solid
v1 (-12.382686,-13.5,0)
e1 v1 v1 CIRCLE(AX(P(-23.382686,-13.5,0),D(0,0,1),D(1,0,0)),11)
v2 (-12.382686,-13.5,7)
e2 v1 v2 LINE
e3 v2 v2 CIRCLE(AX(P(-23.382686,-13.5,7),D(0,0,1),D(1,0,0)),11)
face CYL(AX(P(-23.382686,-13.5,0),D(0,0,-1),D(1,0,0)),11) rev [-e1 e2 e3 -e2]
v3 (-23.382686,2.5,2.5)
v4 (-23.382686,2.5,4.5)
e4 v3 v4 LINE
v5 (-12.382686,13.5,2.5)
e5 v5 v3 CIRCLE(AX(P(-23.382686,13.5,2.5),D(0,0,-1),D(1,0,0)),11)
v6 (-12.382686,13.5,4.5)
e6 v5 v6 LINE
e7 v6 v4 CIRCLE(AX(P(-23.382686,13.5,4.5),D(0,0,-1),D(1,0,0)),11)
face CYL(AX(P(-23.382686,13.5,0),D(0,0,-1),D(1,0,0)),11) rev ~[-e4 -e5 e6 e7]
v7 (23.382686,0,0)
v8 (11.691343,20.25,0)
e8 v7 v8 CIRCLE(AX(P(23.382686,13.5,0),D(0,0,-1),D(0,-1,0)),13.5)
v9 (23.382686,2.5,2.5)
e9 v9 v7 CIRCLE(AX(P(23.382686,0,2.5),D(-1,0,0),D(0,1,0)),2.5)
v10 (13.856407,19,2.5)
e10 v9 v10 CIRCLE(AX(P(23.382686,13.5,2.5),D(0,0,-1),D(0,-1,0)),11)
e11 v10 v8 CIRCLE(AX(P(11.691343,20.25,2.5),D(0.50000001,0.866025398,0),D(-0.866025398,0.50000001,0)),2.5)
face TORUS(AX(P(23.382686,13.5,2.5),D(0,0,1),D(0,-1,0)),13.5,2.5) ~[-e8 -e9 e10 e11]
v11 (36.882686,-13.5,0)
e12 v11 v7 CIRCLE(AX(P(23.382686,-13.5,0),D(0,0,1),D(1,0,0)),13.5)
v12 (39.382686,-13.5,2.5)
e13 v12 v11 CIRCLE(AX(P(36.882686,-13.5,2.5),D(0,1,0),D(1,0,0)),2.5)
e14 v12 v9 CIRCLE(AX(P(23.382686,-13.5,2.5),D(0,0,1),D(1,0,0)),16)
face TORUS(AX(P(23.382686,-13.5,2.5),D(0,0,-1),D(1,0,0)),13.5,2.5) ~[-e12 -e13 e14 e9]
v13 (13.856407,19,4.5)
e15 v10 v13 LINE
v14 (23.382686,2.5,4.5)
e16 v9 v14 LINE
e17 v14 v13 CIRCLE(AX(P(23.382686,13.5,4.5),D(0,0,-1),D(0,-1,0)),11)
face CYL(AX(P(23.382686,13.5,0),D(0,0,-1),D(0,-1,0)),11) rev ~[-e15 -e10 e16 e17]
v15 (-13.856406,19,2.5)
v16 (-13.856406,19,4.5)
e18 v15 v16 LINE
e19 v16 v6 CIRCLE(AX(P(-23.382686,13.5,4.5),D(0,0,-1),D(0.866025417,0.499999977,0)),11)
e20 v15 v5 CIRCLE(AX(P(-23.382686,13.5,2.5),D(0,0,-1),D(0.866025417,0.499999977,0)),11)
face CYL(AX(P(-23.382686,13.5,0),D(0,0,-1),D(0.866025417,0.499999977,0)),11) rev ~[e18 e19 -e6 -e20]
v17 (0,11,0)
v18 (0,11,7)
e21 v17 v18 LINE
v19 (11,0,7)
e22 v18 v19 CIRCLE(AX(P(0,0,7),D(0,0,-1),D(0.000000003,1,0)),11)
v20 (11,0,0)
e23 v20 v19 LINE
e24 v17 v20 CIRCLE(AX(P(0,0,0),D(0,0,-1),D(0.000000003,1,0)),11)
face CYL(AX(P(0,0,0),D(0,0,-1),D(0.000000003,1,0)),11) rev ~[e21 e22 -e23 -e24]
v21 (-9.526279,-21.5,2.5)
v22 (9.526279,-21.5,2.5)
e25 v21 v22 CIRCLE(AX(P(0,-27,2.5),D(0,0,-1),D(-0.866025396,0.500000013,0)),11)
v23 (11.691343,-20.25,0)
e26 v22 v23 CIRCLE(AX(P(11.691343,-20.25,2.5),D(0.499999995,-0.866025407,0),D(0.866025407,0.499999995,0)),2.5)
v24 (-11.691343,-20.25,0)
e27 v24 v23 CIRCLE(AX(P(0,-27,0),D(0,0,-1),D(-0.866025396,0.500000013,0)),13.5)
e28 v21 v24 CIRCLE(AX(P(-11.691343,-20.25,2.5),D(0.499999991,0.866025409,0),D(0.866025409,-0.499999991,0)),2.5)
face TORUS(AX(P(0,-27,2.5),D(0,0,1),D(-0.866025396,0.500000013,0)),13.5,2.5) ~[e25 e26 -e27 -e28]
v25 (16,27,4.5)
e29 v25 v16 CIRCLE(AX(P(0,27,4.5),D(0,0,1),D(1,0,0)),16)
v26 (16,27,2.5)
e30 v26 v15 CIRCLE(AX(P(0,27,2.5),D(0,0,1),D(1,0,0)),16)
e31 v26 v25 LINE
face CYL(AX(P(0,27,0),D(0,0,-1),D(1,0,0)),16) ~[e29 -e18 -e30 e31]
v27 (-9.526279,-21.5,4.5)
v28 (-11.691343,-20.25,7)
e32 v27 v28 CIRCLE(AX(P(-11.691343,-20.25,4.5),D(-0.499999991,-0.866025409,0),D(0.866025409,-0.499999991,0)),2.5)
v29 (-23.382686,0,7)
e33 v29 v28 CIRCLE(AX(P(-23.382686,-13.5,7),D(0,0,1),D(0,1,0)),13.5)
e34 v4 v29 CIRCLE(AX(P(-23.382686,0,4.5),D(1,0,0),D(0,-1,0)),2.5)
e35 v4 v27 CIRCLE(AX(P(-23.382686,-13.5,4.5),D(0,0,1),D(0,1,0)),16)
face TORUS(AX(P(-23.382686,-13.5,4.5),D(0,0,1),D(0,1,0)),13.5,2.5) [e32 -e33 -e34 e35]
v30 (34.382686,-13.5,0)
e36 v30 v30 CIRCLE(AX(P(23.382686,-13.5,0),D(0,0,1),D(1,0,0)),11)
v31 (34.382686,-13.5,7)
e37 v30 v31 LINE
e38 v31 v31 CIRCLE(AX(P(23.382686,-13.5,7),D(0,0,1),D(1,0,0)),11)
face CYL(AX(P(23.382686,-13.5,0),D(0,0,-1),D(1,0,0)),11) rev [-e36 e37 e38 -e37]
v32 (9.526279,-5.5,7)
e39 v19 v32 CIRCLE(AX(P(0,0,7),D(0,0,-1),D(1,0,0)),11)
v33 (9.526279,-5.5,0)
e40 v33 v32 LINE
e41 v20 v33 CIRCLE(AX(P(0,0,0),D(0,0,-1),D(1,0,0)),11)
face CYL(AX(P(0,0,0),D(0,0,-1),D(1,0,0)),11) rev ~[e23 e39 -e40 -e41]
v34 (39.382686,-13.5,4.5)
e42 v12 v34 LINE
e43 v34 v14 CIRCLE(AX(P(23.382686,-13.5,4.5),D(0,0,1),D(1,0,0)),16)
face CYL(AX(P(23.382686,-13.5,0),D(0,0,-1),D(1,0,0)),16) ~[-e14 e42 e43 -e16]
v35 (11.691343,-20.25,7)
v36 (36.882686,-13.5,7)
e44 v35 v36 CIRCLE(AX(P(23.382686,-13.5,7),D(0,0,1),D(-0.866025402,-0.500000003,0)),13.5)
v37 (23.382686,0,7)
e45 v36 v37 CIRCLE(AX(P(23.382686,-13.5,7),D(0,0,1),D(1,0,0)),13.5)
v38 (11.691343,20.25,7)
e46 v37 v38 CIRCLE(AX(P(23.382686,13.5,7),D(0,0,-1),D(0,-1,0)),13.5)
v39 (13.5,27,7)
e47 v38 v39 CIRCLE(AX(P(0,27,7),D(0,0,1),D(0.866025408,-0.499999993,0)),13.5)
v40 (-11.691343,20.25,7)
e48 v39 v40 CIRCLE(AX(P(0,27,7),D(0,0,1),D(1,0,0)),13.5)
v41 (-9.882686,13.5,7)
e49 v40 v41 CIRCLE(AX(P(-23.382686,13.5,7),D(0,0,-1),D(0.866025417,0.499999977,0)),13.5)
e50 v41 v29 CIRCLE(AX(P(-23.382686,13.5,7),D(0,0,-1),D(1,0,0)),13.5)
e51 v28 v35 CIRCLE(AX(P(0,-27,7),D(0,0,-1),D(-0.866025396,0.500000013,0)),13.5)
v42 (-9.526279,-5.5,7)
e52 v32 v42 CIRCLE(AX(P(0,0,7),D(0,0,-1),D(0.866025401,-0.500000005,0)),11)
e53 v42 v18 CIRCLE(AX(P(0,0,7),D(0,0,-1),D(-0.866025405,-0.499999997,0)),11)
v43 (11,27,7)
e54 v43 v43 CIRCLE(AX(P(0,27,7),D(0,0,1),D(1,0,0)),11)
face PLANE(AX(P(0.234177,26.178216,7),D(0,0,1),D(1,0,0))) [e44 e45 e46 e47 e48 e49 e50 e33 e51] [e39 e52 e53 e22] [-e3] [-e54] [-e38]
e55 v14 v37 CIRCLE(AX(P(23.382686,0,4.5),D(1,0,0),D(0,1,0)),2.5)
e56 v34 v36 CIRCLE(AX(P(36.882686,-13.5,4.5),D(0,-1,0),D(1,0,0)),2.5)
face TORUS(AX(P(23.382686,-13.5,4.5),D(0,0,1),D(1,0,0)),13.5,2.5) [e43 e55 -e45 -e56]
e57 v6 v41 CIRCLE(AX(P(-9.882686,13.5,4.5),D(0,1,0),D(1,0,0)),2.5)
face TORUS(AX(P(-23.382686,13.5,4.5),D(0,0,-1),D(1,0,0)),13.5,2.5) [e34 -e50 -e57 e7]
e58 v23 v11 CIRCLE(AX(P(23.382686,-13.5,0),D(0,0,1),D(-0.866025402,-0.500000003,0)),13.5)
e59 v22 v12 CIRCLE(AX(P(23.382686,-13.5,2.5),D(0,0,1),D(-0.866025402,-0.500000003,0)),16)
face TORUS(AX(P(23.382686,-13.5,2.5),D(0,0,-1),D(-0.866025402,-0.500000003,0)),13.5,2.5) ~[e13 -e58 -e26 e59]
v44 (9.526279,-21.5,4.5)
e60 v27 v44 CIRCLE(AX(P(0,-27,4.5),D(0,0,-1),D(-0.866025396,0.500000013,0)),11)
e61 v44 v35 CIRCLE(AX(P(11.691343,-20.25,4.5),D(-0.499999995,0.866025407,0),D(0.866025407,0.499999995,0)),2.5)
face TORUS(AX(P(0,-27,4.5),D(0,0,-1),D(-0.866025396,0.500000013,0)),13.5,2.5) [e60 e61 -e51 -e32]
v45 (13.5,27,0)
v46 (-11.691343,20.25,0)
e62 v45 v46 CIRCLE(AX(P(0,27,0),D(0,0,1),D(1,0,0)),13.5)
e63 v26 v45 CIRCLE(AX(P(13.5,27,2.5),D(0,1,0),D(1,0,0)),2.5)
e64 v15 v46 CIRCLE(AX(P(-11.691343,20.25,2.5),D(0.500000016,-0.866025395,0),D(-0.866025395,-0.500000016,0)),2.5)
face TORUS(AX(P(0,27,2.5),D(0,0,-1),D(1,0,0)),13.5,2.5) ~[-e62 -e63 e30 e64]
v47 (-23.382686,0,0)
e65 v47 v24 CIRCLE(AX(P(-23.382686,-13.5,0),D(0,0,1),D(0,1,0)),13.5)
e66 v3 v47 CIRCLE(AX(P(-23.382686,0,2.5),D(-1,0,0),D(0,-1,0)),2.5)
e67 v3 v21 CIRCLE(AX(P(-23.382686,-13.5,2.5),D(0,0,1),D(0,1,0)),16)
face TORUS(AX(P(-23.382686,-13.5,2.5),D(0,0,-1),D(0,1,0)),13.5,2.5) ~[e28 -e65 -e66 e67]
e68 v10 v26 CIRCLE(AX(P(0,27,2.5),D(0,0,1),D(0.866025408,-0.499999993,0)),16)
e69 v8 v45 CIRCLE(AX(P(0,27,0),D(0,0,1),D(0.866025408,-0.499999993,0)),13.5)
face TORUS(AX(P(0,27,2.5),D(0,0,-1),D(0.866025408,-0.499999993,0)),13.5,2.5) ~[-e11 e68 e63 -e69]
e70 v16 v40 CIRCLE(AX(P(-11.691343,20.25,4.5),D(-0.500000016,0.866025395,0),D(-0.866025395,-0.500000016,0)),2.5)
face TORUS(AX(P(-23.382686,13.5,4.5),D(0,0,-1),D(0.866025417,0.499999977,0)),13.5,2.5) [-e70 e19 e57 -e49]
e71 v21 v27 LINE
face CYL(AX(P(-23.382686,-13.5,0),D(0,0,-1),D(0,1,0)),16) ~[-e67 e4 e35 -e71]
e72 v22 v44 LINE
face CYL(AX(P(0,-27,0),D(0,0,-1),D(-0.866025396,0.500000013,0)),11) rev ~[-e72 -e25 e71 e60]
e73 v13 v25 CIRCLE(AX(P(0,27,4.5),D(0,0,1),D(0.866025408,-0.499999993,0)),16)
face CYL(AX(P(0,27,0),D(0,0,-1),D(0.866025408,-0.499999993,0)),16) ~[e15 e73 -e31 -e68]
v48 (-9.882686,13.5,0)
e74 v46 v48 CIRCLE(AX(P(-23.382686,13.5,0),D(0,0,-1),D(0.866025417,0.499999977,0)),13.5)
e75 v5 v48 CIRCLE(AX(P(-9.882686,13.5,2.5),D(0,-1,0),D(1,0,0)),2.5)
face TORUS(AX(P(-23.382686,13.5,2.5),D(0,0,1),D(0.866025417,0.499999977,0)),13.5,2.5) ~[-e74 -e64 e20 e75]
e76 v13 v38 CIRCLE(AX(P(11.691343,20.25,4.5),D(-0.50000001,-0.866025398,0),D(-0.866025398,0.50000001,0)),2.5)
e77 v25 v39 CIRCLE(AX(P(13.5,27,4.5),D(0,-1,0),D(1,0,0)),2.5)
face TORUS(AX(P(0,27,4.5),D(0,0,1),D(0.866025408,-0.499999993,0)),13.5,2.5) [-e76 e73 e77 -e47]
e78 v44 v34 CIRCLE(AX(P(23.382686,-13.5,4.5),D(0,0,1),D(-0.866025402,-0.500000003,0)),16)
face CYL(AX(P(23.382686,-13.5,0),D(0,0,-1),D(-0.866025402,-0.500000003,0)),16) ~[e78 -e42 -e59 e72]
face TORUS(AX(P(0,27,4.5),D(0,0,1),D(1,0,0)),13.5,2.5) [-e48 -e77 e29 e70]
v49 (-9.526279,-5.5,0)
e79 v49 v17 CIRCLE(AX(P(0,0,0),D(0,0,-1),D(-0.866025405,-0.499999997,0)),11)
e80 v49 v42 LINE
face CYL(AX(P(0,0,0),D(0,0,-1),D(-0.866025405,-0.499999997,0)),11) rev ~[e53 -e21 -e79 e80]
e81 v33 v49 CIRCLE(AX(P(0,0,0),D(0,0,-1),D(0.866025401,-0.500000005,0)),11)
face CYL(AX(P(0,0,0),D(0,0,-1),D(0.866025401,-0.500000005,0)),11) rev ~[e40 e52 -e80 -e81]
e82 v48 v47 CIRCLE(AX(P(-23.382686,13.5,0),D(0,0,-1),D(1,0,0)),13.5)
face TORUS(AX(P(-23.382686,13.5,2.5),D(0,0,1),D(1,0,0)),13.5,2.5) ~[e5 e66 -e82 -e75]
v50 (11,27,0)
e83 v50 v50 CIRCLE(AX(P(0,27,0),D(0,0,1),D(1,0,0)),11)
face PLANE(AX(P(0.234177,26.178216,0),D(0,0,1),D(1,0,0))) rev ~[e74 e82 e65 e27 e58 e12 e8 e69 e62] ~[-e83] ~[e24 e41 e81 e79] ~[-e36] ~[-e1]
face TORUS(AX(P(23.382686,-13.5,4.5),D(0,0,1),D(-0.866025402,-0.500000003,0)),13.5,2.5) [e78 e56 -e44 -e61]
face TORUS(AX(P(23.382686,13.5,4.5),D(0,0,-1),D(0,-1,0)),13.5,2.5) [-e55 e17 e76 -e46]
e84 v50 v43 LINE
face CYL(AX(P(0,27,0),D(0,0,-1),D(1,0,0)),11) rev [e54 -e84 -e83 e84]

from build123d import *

# Parameters (mm, degrees)
F0_R     = 11
F1_DEPTH = 7
F2_R     = 2.5


with BuildPart() as f1:
    # F0 (on Top) → F1 (new body)
    with BuildSketch(Plane.XY):
        with BuildLine():
            ThreePointArc((-13.8564063169, 18.9999997511), (-7.9999998612, 13.1435934593), (3.3e-08, 11))
            ThreePointArc((3.3e-08, 11), (8.0000000671, 13.1435935782), (13.8564065215, 19.0000001056))
            ThreePointArc((13.8564065215, 19.0000001056), (15.4548132364, 22.8588953372), (16, 27))
            ThreePointArc((16, 27), (-4.1411048604, 42.4548131834), (-13.8564063169, 18.9999997511))
        make_face()
        with Locations((0, 27)):
            Circle(F0_R, mode=Mode.SUBTRACT)
        with BuildLine():
            ThreePointArc((-9.5262794581, -5.4999999715), (-9.5262794251, 5.5000000286), (3.3e-08, 11))
            ThreePointArc((3.3e-08, 11), (-7.9999998612, 13.1435934593), (-13.8564063169, 18.9999997511))
            ThreePointArc((-13.8564063169, 18.9999997511), (-12.7575017758, 16.3470093573), (-12.3826859022, 13.5))
            ThreePointArc((-12.3826859022, 13.5), (-15.6045113091, 5.7218254069), (-23.3826859022, 2.5))
            ThreePointArc((-23.3826859022, 2.5), (-15.3826859164, 0.3564064688), (-9.5262794581, -5.4999999715))
        make_face()
        with BuildLine():
            ThreePointArc((9.5262794719, -21.5000000524), (7.3826859022, -13.5000000639), (9.5262794079, -5.5000000584))
            ThreePointArc((9.5262794079, -5.5000000584), (-5.02e-08, -11), (-9.5262794581, -5.4999999715))
            ThreePointArc((-9.5262794581, -5.4999999715), (-7.9278726858, -9.3588952624), (-7.3826859022, -13.5))
            ThreePointArc((-7.3826859022, -13.5), (-7.9278726602, -17.641104642), (-9.5262793592, -21.4999998571))
            ThreePointArc((-9.5262793592, -21.4999998571), (1.127e-07, -16), (9.5262794719, -21.5000000524))
        make_face()
        with BuildLine():
            ThreePointArc((3.3e-08, 11), (7.7781746047, 7.7781745814), (11, 0))
            ThreePointArc((11, 0), (10.6251840805, -2.8470095287), (9.5262794079, -5.5000000584))
            ThreePointArc((9.5262794079, -5.5000000584), (15.382685873, 0.3564064437), (23.3826859022, 2.5))
            ThreePointArc((23.3826859022, 2.5), (13.8564064301, 8.0000000528), (13.8564065215, 19.0000001056))
            ThreePointArc((13.8564065215, 19.0000001056), (8.0000000671, 13.1435935782), (3.3e-08, 11))
        make_face()
        with BuildLine():
            ThreePointArc((-7.3826859022, -13.5), (-7.9278726858, -9.3588952624), (-9.5262794581, -5.4999999715))
            ThreePointArc((-9.5262794581, -5.4999999715), (-15.3826859164, 0.3564064688), (-23.3826859022, 2.5))
            ThreePointArc((-23.3826859022, 2.5), (-37.2390923215, -21.5000000714), (-9.5262793592, -21.4999998571))
            ThreePointArc((-9.5262793592, -21.4999998571), (-7.9278726602, -17.641104642), (-7.3826859022, -13.5))
        make_face()
        with Locations((-23.3826859022, -13.5)):
            Circle(F0_R, mode=Mode.SUBTRACT)
        with BuildLine():
            ThreePointArc((23.3826859022, 2.5), (15.382685873, 0.3564064437), (9.5262794079, -5.5000000584))
            ThreePointArc((9.5262794079, -5.5000000584), (7.3826859022, -13.5000000639), (9.5262794719, -21.5000000524))
            ThreePointArc((9.5262794719, -21.5000000524), (27.523790653, -28.9548132128), (39.3826859022, -13.5))
            ThreePointArc((39.3826859022, -13.5), (34.6963944012, -2.186291501), (23.3826859022, 2.5))
        make_face()
        with Locations((23.3826859022, -13.5)):
            Circle(F0_R, mode=Mode.SUBTRACT)
    extrude(amount=F1_DEPTH)

    # F2
    f2_edges = [f1.edges().sort_by_distance(p)[0] for p in [
        (0, 43, 7),
        (0, 43, 0),
        (13.856406, 8, 7),
        (13.856406, 8, 0),
        (37.239092, -21.5, 0),
        (37.239092, -21.5, 7),
        (0, -16, 7),
        (0, -16, 0),
        (-37.239092, -21.5, 0),
        (-37.239092, -21.5, 7),
        (-13.856407, 8, 7),
        (-13.856407, 8, 0),
    ]]
    fillet(f2_edges, radius=F2_R)


solid = f1.part
